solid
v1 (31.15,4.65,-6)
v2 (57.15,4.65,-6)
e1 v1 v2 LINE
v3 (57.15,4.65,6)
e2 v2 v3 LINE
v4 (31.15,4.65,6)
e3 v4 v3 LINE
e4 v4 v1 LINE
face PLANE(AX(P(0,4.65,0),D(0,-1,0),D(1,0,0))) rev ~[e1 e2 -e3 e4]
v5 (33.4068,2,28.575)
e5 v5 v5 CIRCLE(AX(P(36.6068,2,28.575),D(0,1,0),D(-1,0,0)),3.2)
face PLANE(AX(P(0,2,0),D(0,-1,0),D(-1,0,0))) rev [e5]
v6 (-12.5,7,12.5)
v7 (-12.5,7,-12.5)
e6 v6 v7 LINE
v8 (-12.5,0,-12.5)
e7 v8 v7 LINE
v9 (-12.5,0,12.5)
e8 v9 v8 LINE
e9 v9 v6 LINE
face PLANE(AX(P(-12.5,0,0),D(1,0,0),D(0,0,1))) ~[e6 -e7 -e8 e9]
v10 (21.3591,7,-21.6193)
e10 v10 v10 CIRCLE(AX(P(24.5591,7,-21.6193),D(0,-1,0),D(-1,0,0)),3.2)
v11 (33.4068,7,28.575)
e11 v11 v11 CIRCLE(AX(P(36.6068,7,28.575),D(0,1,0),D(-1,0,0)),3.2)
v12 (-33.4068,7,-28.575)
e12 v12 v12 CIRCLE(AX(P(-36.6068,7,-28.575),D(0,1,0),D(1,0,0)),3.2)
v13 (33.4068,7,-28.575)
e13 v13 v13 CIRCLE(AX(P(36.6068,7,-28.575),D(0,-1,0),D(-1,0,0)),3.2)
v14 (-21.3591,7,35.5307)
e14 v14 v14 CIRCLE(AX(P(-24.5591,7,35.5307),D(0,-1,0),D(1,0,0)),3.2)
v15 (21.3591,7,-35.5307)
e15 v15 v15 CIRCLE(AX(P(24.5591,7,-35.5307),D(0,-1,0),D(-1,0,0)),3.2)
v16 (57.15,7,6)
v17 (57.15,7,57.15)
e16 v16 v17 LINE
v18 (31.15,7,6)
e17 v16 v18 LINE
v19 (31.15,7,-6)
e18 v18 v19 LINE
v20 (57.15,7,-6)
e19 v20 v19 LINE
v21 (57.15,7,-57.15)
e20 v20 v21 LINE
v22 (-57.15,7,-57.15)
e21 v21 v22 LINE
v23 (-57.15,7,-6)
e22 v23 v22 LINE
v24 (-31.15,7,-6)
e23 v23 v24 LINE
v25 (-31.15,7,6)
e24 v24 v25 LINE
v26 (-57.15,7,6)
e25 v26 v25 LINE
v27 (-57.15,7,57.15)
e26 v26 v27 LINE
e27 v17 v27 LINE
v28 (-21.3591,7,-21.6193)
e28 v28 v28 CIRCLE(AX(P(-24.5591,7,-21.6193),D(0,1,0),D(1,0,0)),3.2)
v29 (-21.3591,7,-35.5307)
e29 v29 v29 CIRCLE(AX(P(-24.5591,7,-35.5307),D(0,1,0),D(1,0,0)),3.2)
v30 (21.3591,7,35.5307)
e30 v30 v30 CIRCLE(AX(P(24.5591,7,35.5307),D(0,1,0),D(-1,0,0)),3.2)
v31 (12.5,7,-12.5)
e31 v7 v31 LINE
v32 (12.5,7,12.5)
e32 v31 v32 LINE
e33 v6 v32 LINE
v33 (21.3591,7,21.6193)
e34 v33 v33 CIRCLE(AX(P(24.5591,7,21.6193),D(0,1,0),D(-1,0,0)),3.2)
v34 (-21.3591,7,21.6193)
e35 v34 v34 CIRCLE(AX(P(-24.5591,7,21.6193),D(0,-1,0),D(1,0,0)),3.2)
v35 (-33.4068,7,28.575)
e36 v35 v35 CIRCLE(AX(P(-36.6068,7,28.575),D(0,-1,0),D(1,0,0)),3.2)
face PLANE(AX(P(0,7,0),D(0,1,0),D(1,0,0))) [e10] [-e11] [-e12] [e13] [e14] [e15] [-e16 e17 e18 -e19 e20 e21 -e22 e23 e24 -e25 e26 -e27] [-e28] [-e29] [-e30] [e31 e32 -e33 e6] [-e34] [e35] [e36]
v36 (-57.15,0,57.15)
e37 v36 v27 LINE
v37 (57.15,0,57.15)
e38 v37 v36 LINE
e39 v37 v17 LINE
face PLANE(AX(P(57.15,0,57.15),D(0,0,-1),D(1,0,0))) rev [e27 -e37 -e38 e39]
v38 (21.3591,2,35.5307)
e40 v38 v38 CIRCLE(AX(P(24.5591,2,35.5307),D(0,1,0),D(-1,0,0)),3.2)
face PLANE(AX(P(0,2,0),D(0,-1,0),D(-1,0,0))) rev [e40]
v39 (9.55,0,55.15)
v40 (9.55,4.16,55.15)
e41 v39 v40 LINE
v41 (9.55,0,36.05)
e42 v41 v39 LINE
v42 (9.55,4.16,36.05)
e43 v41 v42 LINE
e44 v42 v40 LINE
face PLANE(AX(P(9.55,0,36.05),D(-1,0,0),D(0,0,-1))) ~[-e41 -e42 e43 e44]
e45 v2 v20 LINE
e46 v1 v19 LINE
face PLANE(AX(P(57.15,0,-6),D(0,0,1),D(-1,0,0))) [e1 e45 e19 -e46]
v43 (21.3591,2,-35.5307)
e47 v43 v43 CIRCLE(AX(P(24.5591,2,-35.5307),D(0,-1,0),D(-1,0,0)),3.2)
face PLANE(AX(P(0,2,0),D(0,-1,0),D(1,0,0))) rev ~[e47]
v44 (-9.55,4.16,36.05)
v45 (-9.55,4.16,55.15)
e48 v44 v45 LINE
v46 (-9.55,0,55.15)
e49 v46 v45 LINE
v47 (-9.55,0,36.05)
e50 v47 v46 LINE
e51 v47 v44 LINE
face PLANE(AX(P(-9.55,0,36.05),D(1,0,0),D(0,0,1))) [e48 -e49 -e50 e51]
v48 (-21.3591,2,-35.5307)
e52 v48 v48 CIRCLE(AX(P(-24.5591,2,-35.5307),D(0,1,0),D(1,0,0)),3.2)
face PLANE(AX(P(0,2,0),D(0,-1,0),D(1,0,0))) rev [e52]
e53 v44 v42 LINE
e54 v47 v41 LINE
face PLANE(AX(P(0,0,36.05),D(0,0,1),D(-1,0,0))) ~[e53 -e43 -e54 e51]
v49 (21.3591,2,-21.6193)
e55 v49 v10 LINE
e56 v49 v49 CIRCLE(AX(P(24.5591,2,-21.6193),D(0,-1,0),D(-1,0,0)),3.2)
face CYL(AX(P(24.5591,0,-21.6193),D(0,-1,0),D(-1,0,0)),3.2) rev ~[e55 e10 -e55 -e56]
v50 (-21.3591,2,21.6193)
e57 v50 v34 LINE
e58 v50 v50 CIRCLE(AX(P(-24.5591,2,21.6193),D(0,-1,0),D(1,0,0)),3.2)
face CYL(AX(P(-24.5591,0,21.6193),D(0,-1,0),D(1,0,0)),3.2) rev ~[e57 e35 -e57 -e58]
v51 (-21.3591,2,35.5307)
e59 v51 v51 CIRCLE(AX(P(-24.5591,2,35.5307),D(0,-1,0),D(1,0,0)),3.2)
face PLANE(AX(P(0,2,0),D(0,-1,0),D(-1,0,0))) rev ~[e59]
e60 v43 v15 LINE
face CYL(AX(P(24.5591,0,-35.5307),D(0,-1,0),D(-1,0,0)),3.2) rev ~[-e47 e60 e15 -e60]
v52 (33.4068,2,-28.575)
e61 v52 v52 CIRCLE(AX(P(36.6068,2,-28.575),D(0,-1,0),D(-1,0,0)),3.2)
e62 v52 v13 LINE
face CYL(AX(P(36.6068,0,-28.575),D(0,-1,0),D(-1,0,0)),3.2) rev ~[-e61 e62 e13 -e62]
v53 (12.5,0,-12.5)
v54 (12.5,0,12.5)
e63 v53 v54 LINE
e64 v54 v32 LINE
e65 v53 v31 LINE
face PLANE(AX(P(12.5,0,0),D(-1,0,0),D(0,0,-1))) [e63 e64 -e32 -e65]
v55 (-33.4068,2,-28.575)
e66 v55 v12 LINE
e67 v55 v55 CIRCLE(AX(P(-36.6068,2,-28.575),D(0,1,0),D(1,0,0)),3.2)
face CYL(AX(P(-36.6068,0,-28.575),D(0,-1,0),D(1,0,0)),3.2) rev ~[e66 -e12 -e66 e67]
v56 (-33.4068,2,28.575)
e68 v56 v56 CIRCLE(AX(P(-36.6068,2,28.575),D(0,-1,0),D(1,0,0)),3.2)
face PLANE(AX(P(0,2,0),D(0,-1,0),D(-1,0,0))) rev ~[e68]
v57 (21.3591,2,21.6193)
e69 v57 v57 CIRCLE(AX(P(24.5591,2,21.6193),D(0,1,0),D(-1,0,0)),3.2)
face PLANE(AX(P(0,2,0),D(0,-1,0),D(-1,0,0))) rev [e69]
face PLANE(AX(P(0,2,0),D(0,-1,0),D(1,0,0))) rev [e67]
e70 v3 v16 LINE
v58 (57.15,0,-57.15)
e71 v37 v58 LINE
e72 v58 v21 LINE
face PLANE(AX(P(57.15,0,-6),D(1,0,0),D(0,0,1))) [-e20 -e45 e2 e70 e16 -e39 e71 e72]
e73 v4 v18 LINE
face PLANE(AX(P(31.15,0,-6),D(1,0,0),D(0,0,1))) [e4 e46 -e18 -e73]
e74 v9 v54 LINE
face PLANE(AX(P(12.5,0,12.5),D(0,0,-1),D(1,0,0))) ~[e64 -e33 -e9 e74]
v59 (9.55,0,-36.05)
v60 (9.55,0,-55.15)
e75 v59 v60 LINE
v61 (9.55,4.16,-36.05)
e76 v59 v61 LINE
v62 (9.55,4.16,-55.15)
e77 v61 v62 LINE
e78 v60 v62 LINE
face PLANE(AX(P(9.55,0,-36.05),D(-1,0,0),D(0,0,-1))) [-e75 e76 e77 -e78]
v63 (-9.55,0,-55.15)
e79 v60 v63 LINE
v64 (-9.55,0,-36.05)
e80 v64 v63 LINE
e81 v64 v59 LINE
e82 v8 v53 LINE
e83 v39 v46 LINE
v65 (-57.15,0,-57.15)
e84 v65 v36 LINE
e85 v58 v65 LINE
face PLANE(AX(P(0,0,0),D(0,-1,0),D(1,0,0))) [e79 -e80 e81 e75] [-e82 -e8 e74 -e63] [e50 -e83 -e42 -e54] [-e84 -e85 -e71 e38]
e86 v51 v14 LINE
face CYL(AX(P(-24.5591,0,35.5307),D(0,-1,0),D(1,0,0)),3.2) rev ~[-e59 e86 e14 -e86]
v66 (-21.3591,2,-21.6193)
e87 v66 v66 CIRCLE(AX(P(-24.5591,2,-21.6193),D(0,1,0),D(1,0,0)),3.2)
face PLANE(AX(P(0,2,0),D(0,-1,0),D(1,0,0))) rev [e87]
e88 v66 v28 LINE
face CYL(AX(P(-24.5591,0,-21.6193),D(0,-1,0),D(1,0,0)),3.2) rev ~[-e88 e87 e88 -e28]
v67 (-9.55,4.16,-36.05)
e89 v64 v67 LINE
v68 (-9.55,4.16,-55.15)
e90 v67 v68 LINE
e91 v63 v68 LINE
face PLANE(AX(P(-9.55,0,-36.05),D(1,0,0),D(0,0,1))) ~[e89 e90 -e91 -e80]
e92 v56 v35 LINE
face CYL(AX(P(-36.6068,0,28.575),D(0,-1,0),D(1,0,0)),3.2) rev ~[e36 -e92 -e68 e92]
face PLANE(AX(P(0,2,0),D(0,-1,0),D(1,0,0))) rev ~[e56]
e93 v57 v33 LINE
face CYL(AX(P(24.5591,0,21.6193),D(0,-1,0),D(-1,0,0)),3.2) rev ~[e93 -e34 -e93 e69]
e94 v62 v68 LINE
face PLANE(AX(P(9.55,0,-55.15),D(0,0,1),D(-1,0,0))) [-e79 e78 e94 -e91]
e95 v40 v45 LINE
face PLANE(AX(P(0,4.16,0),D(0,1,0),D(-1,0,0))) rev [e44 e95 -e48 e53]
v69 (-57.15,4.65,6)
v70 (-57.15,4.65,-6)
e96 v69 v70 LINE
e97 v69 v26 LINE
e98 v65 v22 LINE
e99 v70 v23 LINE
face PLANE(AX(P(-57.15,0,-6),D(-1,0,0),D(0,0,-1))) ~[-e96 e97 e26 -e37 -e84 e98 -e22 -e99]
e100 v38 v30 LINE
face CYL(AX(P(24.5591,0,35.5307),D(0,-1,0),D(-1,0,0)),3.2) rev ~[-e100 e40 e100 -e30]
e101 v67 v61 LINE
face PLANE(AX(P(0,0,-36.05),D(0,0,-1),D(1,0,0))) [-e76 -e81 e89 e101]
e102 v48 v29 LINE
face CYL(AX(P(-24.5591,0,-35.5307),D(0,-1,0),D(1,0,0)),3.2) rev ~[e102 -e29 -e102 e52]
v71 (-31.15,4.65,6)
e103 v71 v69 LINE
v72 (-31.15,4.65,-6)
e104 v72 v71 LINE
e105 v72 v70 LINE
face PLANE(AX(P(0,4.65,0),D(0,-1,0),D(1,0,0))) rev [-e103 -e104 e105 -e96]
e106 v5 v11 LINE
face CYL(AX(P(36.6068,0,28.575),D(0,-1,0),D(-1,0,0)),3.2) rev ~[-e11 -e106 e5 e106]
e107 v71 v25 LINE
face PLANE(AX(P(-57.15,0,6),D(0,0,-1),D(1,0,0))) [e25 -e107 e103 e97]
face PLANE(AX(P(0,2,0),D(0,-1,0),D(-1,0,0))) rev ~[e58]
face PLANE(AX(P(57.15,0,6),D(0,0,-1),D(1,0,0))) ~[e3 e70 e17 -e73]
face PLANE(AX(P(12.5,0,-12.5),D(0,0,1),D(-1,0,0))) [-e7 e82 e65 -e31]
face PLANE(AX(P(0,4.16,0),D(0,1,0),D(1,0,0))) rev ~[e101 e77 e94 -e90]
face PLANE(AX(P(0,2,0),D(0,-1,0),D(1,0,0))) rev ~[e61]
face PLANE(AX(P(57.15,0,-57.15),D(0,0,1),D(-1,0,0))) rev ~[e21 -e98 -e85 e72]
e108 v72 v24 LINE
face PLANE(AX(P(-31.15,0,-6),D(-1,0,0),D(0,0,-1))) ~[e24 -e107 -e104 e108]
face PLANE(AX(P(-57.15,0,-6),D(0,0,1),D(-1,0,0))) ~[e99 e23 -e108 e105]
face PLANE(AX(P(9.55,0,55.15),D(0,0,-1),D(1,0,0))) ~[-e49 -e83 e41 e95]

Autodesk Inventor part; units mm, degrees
ref_plane "YZ Plane" through (0, 0, 0) normal (1, 0, 0) x (0, 1, 0)
ref_plane "XZ Plane" through (0, 0, 0) normal (0, 1, 0) x (-1, 0, 0)
ref_plane "XY Plane" through (0, 0, 0) normal (0, 0, 1) x (1, 0, 0)
sketch "Sketch1" plane through (0, 0, 0) normal (0, 1, 0) x (-1, 0, 0)
  line L0 (12.5, 12.5) -> (-12.5, 12.5)
  line L1 (-12.5, 12.5) -> (-12.5, -12.5)
  line L2 (-12.5, -12.5) -> (12.5, -12.5)
  line L3 (12.5, -12.5) -> (12.5, 12.5)
  line L4 (57.15, 6) -> (31.15, 6)
  line L5 (31.15, 6) -> (31.15, -6)
  line L6 (31.15, -6) -> (57.15, -6)
  line L7 (57.15, -6) -> (57.15, 6)
  line L8 (-31.15, 6) -> (-57.15, 6)
  line L9 (-57.15, 6) -> (-57.15, -6)
  line L10 (-57.15, -6) -> (-31.15, -6)
  line L11 (-31.15, -6) -> (-31.15, 6)
  line L12 (9.55, 55.15) -> (-9.55, 55.15)
  line L13 (-9.55, 55.15) -> (-9.55, 36.05)
  line L14 (-9.55, 36.05) -> (9.55, 36.05)
  line L15 (9.55, 36.05) -> (9.55, 55.15)
  line L16 (9.55, -36.05) -> (-9.55, -36.05)
  line L17 (-9.55, -36.05) -> (-9.55, -55.15)
  line L18 (-9.55, -55.15) -> (9.55, -55.15)
  line L19 (9.55, -55.15) -> (9.55, -36.05)
  line L20 (57.15, 57.15) -> (-57.15, 57.15)
  line L21 (-57.15, 57.15) -> (-57.15, -57.15)
  line L22 (-57.15, -57.15) -> (57.15, -57.15)
  line L23 (57.15, -57.15) -> (57.15, 57.15)
  circle A0 centre (-28.575, -28.575) radius 16.0636
  line L24 (-28.575, -28.575) -> (-44.6386, -28.575)
  line L25 (-28.575, -28.575) -> (-20.5432, -42.4865)
  line L26 (-28.575, -28.575) -> (-12.5114, -28.575) construction
  line L27 (-28.575, -28.575) -> (-20.5432, -14.6635)
  circle A1 centre (-24.5591, -21.6193) radius 3.2
  circle A2 centre (-24.5591, -35.5307) radius 3.2
  circle A3 centre (-36.6068, -28.575) radius 3.2
  line L28 (0, 0) -> (-12.5, -12.5)
  circle A4 centre (-28.575, 28.575) radius 16.0636
  line L29 (-28.575, 28.575) -> (-44.6386, 28.575)
  line L30 (-28.575, 28.575) -> (-20.5432, 14.6635)
  line L31 (-28.575, 28.575) -> (-20.5432, 42.4865)
  circle A5 centre (-24.5591, 35.5307) radius 3.2
  circle A6 centre (-24.5591, 21.6193) radius 3.2
  circle A7 centre (-36.6068, 28.575) radius 3.2
  circle A8 centre (28.575, 28.575) radius 16.0636
  line L32 (28.575, 28.575) -> (12.5114, 28.575)
  line L33 (28.575, 28.575) -> (36.6068, 14.6635)
  line L34 (28.575, 28.575) -> (36.6068, 42.4865)
  circle A9 centre (32.5909, 35.5307) radius 3.2
  circle A10 centre (32.5909, 21.6193) radius 3.2
  circle A11 centre (20.5432, 28.575) radius 3.2
  circle A12 centre (28.575, -28.575) radius 16.0636
  line L35 (28.575, -28.575) -> (12.5114, -28.575)
  line L36 (28.575, -28.575) -> (36.6068, -42.4865)
  line L37 (28.575, -28.575) -> (36.6068, -14.6635)
  circle A13 centre (32.5909, -21.6193) radius 3.2
  circle A14 centre (32.5909, -35.5307) radius 3.2
  circle A15 centre (20.5432, -28.575) radius 3.2
  line L38 (34.1909, 38.302) -> (36.6068, 42.4865)
  line L39 (30.9909, 32.7595) -> (28.575, 28.575)
  line L40 (30.9909, 24.3905) -> (28.575, 28.575)
  line L41 (34.1909, 18.848) -> (36.6068, 14.6635)
  line L42 (23.7432, 28.575) -> (28.575, 28.575)
  line L43 (17.3432, 28.575) -> (12.5114, 28.575)
  line L44 (28.575, 28.575) -> (23.7432, 28.575)
  line L45 (-28.575, 28.575) -> (-26.1591, 24.3905)
  line L46 (-22.9591, 18.848) -> (-20.5432, 14.6635)
  line L47 (-26.1591, 32.7595) -> (-28.575, 28.575)
  line L48 (-22.9591, 38.302) -> (-20.5432, 42.4865)
  line L49 (-39.8068, 28.575) -> (-44.6386, 28.575)
  line L50 (-33.4068, 28.575) -> (-28.575, 28.575)
  line L51 (-22.9591, 18.848) -> (-20.5432, 14.6635)
  line L52 (-44.6386, -28.575) -> (-39.8068, -28.575)
  line L53 (-33.4068, -28.575) -> (-28.575, -28.575)
  line L54 (-28.575, -28.575) -> (-26.1591, -32.7595)
  line L55 (-22.9591, -38.302) -> (-20.5432, -42.4865)
  line L56 (-28.575, -28.575) -> (-26.1591, -24.3905)
  line L57 (-22.9591, -18.848) -> (-20.5432, -14.6635)
  line L58 (0, 0) -> (0, -57.15)
  line L59 (0, 0) -> (-57.15, 0)
  line L60 (0, 0) -> (-31.15, 0)
  line L61 (0, 0) -> (0, -36.05)
  line L62 (0, 0) -> (0, -12.5)
  line L63 (0, 0) -> (-12.5, 0)
  line L64 (-57.15, 0) -> (-57.15, -6)
  line L65 (-57.15, 0) -> (-57.15, -57.15)
  line L66 (-57.15, -57.15) -> (0, -57.15)
  line L67 (0, -55.15) -> (0, -57.15)
  line L68 (0, -36.05) -> (0, -55.15)
  line L69 (0, -36.05) -> (0, -12.5)
  point P0 (-28.575, 28.575)
  point P1 (28.575, 28.575)
  point P2 (28.575, -28.575)
  dimension "d2" = 25
  dimension "d3" = 25
  dimension "d4" = 12.5
  dimension "d5" = 12.5
  dimension "d6" = 6
  dimension "d7" = 12
  dimension "d8" = 26
  dimension "d9" = 26
  dimension "d10" = 6
  dimension "d11" = 12
  dimension "d12" = 19.1
  dimension "d13" = 19.1
  dimension "d14" = 9.55
  dimension "d15" = 19.1
  dimension "d16" = 19.1
  dimension "d17" = 9.55
  dimension "d22" = 0
  dimension "d23" = 0
  dimension "d24" = 2
  dimension "d25" = 2
  dimension "d26" = 114.3
  dimension "d28" = 57.15
  dimension "d29" = 57.15
  dimension "d30" = 114.3
  dimension "d37" = 28.575
  dimension "d38" = 28.575
  dimension "d39" = 6.4
  dimension "d40" = 6.4
  dimension "d41" = 6.4
  dimension "d43" = 120
  dimension "d44" = 120
  dimension "d45" = 32.1272
  dimension "d46" = 28.575
  dimension "d47" = 28.575
  dimension "d48" = 28.575
  dimension "d49" = 28.575
  dimension "d50" = 28.575
  dimension "d51" = 28.575
  dimension "d52" = 6.4
  dimension "d53" = 6.4
  dimension "d54" = 6.4
  dimension "d55" = 120
  dimension "d56" = 120
  dimension "d57" = 32.1272
  dimension "d58" = 6.4
  dimension "d59" = 6.4
  dimension "d60" = 6.4
  dimension "d61" = 120
  dimension "d62" = 120
  dimension "d63" = 32.1272
  dimension "d64" = 6.4
  dimension "d65" = 6.4
  dimension "d66" = 6.4
  dimension "d67" = 120
  dimension "d68" = 120
  dimension "d69" = 32.1272
extrude "Extrusion1" add sketch "Sketch1" along normal blind 7 contours L1 L2 L58 L16 L17 L18 L22 L21 L10 L11 L59 | A0 L25 A2 L27 A1 | L27 A1 L24 A3 A0 | A0 L24 A3 L25 A2
sketch "Sketch2" plane through (0, 0, 0) normal (0, -1, 0) x (1, 0, 0)
  circle A0 centre (36.6068, -28.575) radius 3.2 projected
  circle A1 centre (36.6068, -28.575) radius 3.2
  circle A2 centre (24.5591, -21.6193) radius 3.2 projected
  circle A3 centre (24.5591, -21.6193) radius 3.2
  circle A4 centre (24.5591, -35.5307) radius 3.2 projected
  circle A5 centre (24.5591, -35.5307) radius 3.2
  point P0 (0, 0)
extrude "Extrusion2" add sketch "Sketch2" against normal blind 2
sketch "Sketch3" plane through (0, 0, 0) normal (0, -1, 0) x (1, 0, 0)
  line L0 (31.15, -6) -> (57.15, -6)
  line L1 (57.15, -6) -> (57.15, 0)
  line L2 (57.15, 0) -> (31.15, 0)
  line L3 (31.15, 0) -> (31.15, -6)
  point P0 (0, 0)
extrude "Extrusion3" add sketch "Sketch3" against normal blind 4.65
sketch "Sketch4" plane through (0, 7, 0) normal (0, 1, 0) x (1, 0, 0)
  line L0 (9.55, 55.15) -> (0, 55.15)
  line L1 (0, 55.15) -> (0, 36.05)
  line L2 (0, 36.05) -> (9.55, 36.05)
  line L3 (9.55, 36.05) -> (9.55, 55.15)
  point P0 (0, 0)
extrude "Extrusion4" add sketch "Sketch4" against normal blind 2.84
mirror "Mirror1" about plane through (0, 0, -36.05) normal (-1, 0, 0)
mirror "Mirror2" about plane through (-12.5, 0, 0) normal (0, 0, 1)
properties part number "Prototype1"
